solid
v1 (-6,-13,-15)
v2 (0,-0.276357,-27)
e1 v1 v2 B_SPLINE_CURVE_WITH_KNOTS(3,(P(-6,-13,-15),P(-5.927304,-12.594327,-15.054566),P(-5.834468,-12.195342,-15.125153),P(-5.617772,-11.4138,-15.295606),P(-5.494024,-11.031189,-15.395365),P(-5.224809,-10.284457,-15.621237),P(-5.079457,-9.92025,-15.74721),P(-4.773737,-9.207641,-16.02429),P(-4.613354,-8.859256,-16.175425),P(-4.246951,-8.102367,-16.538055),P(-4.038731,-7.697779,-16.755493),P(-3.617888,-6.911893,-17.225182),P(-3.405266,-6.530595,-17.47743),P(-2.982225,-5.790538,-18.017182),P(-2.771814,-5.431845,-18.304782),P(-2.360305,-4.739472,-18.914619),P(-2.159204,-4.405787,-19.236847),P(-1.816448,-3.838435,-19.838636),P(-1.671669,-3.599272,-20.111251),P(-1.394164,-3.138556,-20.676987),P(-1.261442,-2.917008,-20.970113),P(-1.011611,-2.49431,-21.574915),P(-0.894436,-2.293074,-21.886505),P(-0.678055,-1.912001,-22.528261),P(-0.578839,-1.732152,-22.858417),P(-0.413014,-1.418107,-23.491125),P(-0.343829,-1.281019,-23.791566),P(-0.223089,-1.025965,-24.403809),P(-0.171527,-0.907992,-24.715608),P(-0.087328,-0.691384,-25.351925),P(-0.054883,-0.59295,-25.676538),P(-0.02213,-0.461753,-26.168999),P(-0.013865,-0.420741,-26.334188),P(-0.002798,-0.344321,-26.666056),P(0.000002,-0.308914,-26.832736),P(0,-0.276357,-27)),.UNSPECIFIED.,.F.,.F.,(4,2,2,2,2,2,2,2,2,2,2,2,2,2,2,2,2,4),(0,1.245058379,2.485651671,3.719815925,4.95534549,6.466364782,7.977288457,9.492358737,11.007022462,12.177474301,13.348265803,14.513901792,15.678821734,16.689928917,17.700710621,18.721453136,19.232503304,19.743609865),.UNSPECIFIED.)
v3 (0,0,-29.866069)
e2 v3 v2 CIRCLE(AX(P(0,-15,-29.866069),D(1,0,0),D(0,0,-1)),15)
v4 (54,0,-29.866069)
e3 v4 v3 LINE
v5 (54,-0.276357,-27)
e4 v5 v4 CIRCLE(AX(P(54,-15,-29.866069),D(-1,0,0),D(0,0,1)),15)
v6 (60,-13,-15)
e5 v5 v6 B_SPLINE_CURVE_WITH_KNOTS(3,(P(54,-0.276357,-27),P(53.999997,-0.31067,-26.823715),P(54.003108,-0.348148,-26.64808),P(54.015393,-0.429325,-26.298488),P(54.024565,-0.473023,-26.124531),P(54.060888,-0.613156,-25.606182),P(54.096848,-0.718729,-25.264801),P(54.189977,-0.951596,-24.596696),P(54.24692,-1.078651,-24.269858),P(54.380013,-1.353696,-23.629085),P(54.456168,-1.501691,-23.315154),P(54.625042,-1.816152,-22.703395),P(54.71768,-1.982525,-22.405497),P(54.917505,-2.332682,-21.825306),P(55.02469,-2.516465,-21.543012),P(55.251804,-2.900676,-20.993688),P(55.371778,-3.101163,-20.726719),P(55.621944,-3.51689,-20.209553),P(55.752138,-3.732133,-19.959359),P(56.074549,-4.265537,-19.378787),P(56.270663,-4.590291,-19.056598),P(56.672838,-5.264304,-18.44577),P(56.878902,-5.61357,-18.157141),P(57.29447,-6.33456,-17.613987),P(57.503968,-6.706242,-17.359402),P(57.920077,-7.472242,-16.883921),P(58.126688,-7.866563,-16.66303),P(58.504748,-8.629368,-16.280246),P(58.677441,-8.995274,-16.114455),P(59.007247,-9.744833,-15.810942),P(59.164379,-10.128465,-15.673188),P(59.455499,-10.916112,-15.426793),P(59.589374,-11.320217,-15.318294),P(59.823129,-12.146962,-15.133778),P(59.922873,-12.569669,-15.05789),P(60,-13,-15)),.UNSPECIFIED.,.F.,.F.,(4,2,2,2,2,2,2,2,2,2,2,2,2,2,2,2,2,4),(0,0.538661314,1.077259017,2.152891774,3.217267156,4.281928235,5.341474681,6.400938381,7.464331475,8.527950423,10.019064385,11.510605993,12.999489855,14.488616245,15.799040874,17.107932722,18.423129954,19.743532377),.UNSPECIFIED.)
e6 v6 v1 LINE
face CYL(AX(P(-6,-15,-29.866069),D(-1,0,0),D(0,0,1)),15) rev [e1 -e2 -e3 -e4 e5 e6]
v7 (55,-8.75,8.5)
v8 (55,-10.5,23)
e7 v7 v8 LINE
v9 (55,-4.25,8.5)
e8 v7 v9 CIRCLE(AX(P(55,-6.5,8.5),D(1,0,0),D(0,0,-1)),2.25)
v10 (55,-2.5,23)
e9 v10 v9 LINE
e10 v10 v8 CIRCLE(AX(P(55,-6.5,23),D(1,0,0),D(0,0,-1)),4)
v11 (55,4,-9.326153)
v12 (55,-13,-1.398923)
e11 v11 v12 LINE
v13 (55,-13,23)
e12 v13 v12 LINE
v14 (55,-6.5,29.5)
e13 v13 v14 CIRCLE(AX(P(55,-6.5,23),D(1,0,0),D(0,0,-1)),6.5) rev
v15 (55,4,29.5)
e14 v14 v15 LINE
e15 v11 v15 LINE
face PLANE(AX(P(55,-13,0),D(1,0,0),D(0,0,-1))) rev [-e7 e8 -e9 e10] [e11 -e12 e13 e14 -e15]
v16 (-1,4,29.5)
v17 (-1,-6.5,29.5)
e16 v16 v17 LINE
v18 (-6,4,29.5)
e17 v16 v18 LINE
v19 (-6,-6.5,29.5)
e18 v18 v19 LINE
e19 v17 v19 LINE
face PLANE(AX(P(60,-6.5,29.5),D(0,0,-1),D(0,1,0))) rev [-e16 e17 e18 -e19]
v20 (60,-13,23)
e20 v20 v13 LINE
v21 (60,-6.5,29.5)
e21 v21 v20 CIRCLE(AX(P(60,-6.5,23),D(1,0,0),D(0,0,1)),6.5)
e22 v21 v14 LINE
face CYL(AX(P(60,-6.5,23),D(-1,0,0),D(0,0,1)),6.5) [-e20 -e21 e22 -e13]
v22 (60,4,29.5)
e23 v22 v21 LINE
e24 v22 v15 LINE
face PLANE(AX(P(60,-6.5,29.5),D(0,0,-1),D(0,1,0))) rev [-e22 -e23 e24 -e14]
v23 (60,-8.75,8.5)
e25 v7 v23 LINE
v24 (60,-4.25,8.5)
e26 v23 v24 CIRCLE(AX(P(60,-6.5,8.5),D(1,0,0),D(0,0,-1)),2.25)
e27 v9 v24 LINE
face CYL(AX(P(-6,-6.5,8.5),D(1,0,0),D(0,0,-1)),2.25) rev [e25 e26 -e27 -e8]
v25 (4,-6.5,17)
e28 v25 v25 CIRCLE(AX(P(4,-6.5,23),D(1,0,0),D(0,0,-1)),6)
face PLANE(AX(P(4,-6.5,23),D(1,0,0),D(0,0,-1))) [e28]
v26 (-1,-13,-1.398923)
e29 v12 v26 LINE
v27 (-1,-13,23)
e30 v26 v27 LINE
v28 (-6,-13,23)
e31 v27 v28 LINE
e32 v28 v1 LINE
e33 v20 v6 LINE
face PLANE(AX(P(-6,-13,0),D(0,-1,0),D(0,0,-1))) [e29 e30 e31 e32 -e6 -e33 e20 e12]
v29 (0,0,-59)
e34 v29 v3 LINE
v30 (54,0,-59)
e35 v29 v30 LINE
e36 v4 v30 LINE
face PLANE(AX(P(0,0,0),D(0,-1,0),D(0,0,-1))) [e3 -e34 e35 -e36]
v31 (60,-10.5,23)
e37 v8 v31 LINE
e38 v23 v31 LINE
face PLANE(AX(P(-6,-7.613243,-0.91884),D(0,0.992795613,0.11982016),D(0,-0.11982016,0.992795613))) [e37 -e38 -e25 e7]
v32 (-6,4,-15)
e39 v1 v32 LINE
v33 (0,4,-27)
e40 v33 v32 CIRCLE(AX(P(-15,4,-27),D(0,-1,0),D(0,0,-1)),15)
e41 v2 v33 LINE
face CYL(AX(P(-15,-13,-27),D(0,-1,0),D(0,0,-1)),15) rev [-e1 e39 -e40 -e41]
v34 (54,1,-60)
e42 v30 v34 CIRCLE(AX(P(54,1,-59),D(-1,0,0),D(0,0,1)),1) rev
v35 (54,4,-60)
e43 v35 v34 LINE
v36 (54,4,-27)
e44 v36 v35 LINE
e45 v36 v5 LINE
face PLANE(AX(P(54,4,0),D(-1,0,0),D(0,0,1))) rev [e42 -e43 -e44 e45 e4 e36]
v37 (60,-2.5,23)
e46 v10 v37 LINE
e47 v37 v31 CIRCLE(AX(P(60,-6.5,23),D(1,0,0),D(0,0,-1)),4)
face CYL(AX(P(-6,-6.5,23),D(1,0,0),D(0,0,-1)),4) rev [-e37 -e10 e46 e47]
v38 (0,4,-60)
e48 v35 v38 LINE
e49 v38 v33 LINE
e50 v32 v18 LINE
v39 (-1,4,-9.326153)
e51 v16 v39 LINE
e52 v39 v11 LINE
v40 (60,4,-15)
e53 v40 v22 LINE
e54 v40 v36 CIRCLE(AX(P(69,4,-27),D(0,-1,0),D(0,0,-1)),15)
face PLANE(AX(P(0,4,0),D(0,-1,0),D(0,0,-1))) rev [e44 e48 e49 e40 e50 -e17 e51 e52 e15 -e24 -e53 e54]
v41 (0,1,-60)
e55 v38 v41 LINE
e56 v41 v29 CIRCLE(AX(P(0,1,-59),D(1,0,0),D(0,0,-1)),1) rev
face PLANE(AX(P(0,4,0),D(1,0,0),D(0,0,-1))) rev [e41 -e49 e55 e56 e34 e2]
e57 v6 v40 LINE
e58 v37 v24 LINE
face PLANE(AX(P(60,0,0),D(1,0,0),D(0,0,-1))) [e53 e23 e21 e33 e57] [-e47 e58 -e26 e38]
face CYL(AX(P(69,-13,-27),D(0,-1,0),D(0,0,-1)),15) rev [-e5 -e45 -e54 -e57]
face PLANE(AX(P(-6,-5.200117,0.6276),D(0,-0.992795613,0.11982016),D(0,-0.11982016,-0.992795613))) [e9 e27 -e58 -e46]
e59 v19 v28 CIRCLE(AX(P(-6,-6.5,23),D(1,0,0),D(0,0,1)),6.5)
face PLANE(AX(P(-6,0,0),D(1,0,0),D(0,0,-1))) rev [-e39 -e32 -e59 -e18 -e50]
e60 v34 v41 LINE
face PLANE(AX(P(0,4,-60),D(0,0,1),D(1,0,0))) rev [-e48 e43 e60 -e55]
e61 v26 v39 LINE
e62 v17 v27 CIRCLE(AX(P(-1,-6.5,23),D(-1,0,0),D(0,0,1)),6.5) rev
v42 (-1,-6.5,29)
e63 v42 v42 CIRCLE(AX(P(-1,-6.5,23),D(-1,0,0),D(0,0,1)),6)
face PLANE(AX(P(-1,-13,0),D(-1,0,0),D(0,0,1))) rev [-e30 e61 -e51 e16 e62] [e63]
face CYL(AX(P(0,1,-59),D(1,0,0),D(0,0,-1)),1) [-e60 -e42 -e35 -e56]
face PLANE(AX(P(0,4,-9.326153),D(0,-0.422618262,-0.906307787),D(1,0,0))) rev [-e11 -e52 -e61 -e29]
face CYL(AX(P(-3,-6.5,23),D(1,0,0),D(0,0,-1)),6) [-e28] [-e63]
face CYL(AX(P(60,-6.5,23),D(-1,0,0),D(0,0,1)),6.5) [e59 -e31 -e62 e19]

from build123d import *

# Parameters (mm, degrees)
SKETCH1_W                = 54
SKETCH1_H                = 60
BOSS_EXTRUDE1_DEPTH      = 4
BOSS_EXTRUDE2_DEPTH      = 6
BOSS_EXTRUDE2_DEPTH_BACK = 60
SKETCH2_W                = 10
SKETCH2_H                = 17
SKETCH3_W                = 28
SKETCH3_H                = 13
BOSS_EXTRUDE3_DEPTH      = 66
SKETCH9_W                = 56
SKETCH9_H                = 28
CUT_EXTRUDE3_DEPTH       = 13
SKETCH10_W               = 5
SKETCH10_H               = 28
BOSS_EXTRUDE6_DEPTH      = 4
SKETCH11_R               = 2.25
CUT_EXTRUDE5_DEPTH       = 91.138781887
SKETCH12_W               = 5
SKETCH12_H               = 17
BOSS_EXTRUDE7_DEPTH      = 4
CUT_EXTRUDE6_DEPTH       = 91.138781887
FILLET3_R                = 1
BOSS_EXTRUDE8_DEPTH      = 10
BOSS_EXTRUDE8_DEPTH_BACK = 5
SKETCH14_R               = 4
SKETCH15_W               = 17
SKETCH15_H               = 8
BOSS_EXTRUDE9_DEPTH      = 5
SKETCH16_R               = 6
BOSS_EXTRUDE11_DEPTH     = 12
SKETCH17_R               = 6
CUT_EXTRUDE7_DEPTH       = 5
CHAMFER1_SIZE            = 9.326153163
CHAMFER1_SIZE_2          = 20
SKETCH18_W               = 66
SKETCH18_H               = 5
BOSS_EXTRUDE14_DEPTH     = 17
FILLET8_R                = 15
FILLET9_R                = 15


with BuildPart() as part:
    # Sketch1 → Boss-Extrude1 (new body)
    with BuildSketch(Plane(origin=(0, 0, 0), x_dir=(1, 0, 0), z_dir=(0, 1, 0))):
        with Locations((27, 30)):
            Rectangle(SKETCH1_W, SKETCH1_H)
    extrude(amount=BOSS_EXTRUDE1_DEPTH)

    # Sketch2 → Boss-Extrude2 (add, two sides: drawn at the far end of the back side and taken through both)
    with BuildSketch(Plane(origin=(54, 0, 0), x_dir=(0, 0, -1), z_dir=(1, 0, 0)).offset(-BOSS_EXTRUDE2_DEPTH_BACK)):
        with Locations((5, -4.5)):
            Rectangle(SKETCH2_W, SKETCH2_H)
    extrude(amount=BOSS_EXTRUDE2_DEPTH + BOSS_EXTRUDE2_DEPTH_BACK)

    # Sketch3 → Boss-Extrude3 (add, through all)
    with BuildSketch(Plane(origin=(60, 0, 0), x_dir=(0, 0, -1), z_dir=(1, 0, 0))):
        with Locations((-14, -6.5)):
            Rectangle(SKETCH3_W, SKETCH3_H)
    extrude(amount=-BOSS_EXTRUDE3_DEPTH)

    # Sketch9 → Cut-Extrude3 (cut)
    with BuildSketch(Plane(origin=(0, 0, 0), x_dir=(1, 0, 0), z_dir=(0, 1, 0))):
        with Locations((27, -14)):
            Rectangle(SKETCH9_W, SKETCH9_H)
    extrude(amount=-CUT_EXTRUDE3_DEPTH, mode=Mode.SUBTRACT)

    # Sketch10 → Boss-Extrude6 (add)
    with BuildSketch(Plane(origin=(0, 0, 0), x_dir=(1, 0, 0), z_dir=(0, 1, 0))):
        with Locations((-3.5, -14)):
            Rectangle(SKETCH10_W, SKETCH10_H)
        with Locations((57.5, -14)):
            Rectangle(SKETCH10_W, SKETCH10_H)
    extrude(amount=BOSS_EXTRUDE6_DEPTH)

    # Sketch11 → Cut-Extrude5 (cut, through all)
    with BuildSketch(Plane(origin=(60, 0, 0), x_dir=(0, 0, -1), z_dir=(1, 0, 0))):
        with BuildLine():
            Line((-22.048344565, -2.614854966), (-23, -2.5))
            ThreePointArc((-23, -2.5), (-27, -6.5), (-23, -10.5))
            Line((-23, -10.5), (-22.048344565, -10.385145034))
            ThreePointArc((-22.048344565, -10.385145034), (-19.853047368, -8.96914745), (-19, -6.5))
            ThreePointArc((-19, -6.5), (-19.853047368, -4.03085255), (-22.048344565, -2.614854966))
        make_face()
        with BuildLine():
            Line((-8.5, -4.25), (-22.048344565, -2.614854966))
            ThreePointArc((-22.048344565, -2.614854966), (-19.853047368, -4.03085255), (-19, -6.5))
            ThreePointArc((-19, -6.5), (-19.853047368, -8.96914745), (-22.048344565, -10.385145034))
            Line((-22.048344565, -10.385145034), (-8.5, -8.75))
            ThreePointArc((-8.5, -8.75), (-10.75, -6.5), (-8.5, -4.25))
        make_face()
        with Locations((-8.5, -6.5)):
            Circle(SKETCH11_R)
    extrude(amount=-CUT_EXTRUDE5_DEPTH, mode=Mode.SUBTRACT)

    # Sketch12 → Boss-Extrude7 (add)
    with BuildSketch(Plane.XY.offset(28)):
        with Locations((57.5, -4.5)):
            Rectangle(SKETCH12_W, SKETCH12_H)
        with Locations((-3.5, -4.5)):
            Rectangle(SKETCH12_W, SKETCH12_H)
    extrude(amount=BOSS_EXTRUDE7_DEPTH)

    # Sketch13 → Cut-Extrude6 (cut, through all)
    with BuildSketch(Plane.ZY.offset(6)):
        with BuildLine():
            Line((29.5, -6.5), (29.5, 4))
            Line((29.5, 4), (32, 4))
            Line((32, 4), (32, -13))
            Line((32, -13), (23, -13))
            ThreePointArc((23, -13), (27.596194078, -11.096194078), (29.5, -6.5))
        make_face()
    extrude(amount=-CUT_EXTRUDE6_DEPTH, mode=Mode.SUBTRACT)

    # Fillet3
    fillet3_edges = [part.edges().sort_by_distance(p)[0] for p in [
        (27, 0, -60),
    ]]
    fillet(fillet3_edges, radius=FILLET3_R)

    # Sketch14 → Boss-Extrude8 (add, two sides: drawn at the far end of the back side and taken through both)
    with BuildSketch(Plane(origin=(-1, 0, 0), x_dir=(0, 0, -1), z_dir=(1, 0, 0)).offset(-BOSS_EXTRUDE8_DEPTH_BACK)):
        with Locations((-23, -6.5)):
            Circle(SKETCH14_R)
    extrude(amount=BOSS_EXTRUDE8_DEPTH + BOSS_EXTRUDE8_DEPTH_BACK)

    # Sketch15 → Boss-Extrude9 (add)
    with BuildSketch(Plane(origin=(-1, 0, 0), x_dir=(0, 0, -1), z_dir=(1, 0, 0))):
        with Locations((-14.5, -6.5)):
            Rectangle(SKETCH15_W, SKETCH15_H)
    extrude(amount=-BOSS_EXTRUDE9_DEPTH)

    # Sketch16 → Boss-Extrude11 (add)
    with BuildSketch(Plane(origin=(9, 0, 0), x_dir=(0, 0, -1), z_dir=(1, 0, 0))):
        with Locations((-23, -6.5)):
            Circle(SKETCH16_R)
    extrude(amount=-BOSS_EXTRUDE11_DEPTH)

    # Sketch17 → Cut-Extrude7 (cut)
    with BuildSketch(Plane(origin=(9, 0, 0), x_dir=(0, 0, -1), z_dir=(1, 0, 0))):
        with Locations((-23, -6.5)):
            Circle(SKETCH17_R)
    extrude(amount=-CUT_EXTRUDE7_DEPTH, mode=Mode.SUBTRACT)

    # Chamfer1
    # the kernel refuses this chamfer: 20, 9.326153163 mm, written as the material it takes off along each edge
    with BuildSketch(Plane(origin=(55, 4, 0), x_dir=(0, 0.07481330637059955, -0.9971975577536774), z_dir=(-1, 0, 0))) as chamfer1_piece_1:
        Polygon((CHAMFER1_SIZE * 0.997197557764, CHAMFER1_SIZE * 0.0748133063714), (-CHAMFER1_SIZE_2 * 0.0748133063706, CHAMFER1_SIZE_2 * 0.997197557754), (0, 0), align=None)
    extrude(amount=56, mode=Mode.SUBTRACT)

    # Sketch18 → Boss-Extrude14 (add)
    with BuildSketch(Plane(origin=(0, 4, 0), x_dir=(1, 0, 0), z_dir=(0, 1, 0))):
        with Locations((27, 12.5)):
            Rectangle(SKETCH18_W, SKETCH18_H)
    extrude(amount=-BOSS_EXTRUDE14_DEPTH)

    # Fillet8
    # the kernel refuses this fillet: 15 mm, written as the material it adds along each edge
    with BuildSketch(Plane(origin=(54, 0, -15), x_dir=(0, -1, 0), z_dir=(-1, 0, 0))) as fillet8_piece_1:
        with BuildLine():
            CenterArc((15, -14.866068747), FILLET8_R, 97.662255661, 82.337744339)
            Line((0, -14.866068747), (-0.3, -14.866068747))
            Line((-0.3, -14.866068747), (-0.3, 0))
            Line((-0.3, 0), (0, 0.3))
            ThreePointArc((0, 0.3), (6.5, 0.3), (12.96, 0.297321375))
            Line((12.96, 0.297321375), (13, 0))
        make_face()
    extrude(amount=54)

    # Fillet9
    # the kernel refuses this fillet: 15 mm, written as the material it adds along each edge
    with BuildSketch(Plane(origin=(54, 4, -15), x_dir=(1, 0, 0), z_dir=(0, -1, 0))) as fillet9_piece_1_section:
        with BuildLine():
            CenterArc((15, -12), FILLET9_R, 126.869897646, 53.130102354)
            Line((0, -12), (0, 0))
            Line((0, 0), (6, 0))
        make_face()
    fillet9_piece_1 = extrude(amount=17, mode=Mode.PRIVATE)
    fillet9_piece_1 = fillet9_piece_1 - Plane(origin=(58.238574597, -15, -29.866068747), x_dir=(0, -1, 0), z_dir=(1, 0, 0)) * Cylinder(15, 83, mode=Mode.PRIVATE)
    add(fillet9_piece_1)
    with BuildSketch(Plane(origin=(0, -13, -15), x_dir=(0, 0, -1), z_dir=(0, 1, 0))) as fillet9_piece_2_section:
        with BuildLine():
            CenterArc((12, 15), FILLET9_R, 216.869897646, 53.130102354)
            Line((0, 6), (0, 0))
            Line((0, 0), (12, 0))
        make_face()
    fillet9_piece_2 = extrude(amount=17, mode=Mode.PRIVATE)
    fillet9_piece_2 = fillet9_piece_2 - Plane(origin=(-0.149142202, -15, -29.866068747), x_dir=(0, -1, 0), z_dir=(1, 0, 0)) * Cylinder(15, 82, mode=Mode.PRIVATE)
    add(fillet9_piece_2)


solid = part.part
